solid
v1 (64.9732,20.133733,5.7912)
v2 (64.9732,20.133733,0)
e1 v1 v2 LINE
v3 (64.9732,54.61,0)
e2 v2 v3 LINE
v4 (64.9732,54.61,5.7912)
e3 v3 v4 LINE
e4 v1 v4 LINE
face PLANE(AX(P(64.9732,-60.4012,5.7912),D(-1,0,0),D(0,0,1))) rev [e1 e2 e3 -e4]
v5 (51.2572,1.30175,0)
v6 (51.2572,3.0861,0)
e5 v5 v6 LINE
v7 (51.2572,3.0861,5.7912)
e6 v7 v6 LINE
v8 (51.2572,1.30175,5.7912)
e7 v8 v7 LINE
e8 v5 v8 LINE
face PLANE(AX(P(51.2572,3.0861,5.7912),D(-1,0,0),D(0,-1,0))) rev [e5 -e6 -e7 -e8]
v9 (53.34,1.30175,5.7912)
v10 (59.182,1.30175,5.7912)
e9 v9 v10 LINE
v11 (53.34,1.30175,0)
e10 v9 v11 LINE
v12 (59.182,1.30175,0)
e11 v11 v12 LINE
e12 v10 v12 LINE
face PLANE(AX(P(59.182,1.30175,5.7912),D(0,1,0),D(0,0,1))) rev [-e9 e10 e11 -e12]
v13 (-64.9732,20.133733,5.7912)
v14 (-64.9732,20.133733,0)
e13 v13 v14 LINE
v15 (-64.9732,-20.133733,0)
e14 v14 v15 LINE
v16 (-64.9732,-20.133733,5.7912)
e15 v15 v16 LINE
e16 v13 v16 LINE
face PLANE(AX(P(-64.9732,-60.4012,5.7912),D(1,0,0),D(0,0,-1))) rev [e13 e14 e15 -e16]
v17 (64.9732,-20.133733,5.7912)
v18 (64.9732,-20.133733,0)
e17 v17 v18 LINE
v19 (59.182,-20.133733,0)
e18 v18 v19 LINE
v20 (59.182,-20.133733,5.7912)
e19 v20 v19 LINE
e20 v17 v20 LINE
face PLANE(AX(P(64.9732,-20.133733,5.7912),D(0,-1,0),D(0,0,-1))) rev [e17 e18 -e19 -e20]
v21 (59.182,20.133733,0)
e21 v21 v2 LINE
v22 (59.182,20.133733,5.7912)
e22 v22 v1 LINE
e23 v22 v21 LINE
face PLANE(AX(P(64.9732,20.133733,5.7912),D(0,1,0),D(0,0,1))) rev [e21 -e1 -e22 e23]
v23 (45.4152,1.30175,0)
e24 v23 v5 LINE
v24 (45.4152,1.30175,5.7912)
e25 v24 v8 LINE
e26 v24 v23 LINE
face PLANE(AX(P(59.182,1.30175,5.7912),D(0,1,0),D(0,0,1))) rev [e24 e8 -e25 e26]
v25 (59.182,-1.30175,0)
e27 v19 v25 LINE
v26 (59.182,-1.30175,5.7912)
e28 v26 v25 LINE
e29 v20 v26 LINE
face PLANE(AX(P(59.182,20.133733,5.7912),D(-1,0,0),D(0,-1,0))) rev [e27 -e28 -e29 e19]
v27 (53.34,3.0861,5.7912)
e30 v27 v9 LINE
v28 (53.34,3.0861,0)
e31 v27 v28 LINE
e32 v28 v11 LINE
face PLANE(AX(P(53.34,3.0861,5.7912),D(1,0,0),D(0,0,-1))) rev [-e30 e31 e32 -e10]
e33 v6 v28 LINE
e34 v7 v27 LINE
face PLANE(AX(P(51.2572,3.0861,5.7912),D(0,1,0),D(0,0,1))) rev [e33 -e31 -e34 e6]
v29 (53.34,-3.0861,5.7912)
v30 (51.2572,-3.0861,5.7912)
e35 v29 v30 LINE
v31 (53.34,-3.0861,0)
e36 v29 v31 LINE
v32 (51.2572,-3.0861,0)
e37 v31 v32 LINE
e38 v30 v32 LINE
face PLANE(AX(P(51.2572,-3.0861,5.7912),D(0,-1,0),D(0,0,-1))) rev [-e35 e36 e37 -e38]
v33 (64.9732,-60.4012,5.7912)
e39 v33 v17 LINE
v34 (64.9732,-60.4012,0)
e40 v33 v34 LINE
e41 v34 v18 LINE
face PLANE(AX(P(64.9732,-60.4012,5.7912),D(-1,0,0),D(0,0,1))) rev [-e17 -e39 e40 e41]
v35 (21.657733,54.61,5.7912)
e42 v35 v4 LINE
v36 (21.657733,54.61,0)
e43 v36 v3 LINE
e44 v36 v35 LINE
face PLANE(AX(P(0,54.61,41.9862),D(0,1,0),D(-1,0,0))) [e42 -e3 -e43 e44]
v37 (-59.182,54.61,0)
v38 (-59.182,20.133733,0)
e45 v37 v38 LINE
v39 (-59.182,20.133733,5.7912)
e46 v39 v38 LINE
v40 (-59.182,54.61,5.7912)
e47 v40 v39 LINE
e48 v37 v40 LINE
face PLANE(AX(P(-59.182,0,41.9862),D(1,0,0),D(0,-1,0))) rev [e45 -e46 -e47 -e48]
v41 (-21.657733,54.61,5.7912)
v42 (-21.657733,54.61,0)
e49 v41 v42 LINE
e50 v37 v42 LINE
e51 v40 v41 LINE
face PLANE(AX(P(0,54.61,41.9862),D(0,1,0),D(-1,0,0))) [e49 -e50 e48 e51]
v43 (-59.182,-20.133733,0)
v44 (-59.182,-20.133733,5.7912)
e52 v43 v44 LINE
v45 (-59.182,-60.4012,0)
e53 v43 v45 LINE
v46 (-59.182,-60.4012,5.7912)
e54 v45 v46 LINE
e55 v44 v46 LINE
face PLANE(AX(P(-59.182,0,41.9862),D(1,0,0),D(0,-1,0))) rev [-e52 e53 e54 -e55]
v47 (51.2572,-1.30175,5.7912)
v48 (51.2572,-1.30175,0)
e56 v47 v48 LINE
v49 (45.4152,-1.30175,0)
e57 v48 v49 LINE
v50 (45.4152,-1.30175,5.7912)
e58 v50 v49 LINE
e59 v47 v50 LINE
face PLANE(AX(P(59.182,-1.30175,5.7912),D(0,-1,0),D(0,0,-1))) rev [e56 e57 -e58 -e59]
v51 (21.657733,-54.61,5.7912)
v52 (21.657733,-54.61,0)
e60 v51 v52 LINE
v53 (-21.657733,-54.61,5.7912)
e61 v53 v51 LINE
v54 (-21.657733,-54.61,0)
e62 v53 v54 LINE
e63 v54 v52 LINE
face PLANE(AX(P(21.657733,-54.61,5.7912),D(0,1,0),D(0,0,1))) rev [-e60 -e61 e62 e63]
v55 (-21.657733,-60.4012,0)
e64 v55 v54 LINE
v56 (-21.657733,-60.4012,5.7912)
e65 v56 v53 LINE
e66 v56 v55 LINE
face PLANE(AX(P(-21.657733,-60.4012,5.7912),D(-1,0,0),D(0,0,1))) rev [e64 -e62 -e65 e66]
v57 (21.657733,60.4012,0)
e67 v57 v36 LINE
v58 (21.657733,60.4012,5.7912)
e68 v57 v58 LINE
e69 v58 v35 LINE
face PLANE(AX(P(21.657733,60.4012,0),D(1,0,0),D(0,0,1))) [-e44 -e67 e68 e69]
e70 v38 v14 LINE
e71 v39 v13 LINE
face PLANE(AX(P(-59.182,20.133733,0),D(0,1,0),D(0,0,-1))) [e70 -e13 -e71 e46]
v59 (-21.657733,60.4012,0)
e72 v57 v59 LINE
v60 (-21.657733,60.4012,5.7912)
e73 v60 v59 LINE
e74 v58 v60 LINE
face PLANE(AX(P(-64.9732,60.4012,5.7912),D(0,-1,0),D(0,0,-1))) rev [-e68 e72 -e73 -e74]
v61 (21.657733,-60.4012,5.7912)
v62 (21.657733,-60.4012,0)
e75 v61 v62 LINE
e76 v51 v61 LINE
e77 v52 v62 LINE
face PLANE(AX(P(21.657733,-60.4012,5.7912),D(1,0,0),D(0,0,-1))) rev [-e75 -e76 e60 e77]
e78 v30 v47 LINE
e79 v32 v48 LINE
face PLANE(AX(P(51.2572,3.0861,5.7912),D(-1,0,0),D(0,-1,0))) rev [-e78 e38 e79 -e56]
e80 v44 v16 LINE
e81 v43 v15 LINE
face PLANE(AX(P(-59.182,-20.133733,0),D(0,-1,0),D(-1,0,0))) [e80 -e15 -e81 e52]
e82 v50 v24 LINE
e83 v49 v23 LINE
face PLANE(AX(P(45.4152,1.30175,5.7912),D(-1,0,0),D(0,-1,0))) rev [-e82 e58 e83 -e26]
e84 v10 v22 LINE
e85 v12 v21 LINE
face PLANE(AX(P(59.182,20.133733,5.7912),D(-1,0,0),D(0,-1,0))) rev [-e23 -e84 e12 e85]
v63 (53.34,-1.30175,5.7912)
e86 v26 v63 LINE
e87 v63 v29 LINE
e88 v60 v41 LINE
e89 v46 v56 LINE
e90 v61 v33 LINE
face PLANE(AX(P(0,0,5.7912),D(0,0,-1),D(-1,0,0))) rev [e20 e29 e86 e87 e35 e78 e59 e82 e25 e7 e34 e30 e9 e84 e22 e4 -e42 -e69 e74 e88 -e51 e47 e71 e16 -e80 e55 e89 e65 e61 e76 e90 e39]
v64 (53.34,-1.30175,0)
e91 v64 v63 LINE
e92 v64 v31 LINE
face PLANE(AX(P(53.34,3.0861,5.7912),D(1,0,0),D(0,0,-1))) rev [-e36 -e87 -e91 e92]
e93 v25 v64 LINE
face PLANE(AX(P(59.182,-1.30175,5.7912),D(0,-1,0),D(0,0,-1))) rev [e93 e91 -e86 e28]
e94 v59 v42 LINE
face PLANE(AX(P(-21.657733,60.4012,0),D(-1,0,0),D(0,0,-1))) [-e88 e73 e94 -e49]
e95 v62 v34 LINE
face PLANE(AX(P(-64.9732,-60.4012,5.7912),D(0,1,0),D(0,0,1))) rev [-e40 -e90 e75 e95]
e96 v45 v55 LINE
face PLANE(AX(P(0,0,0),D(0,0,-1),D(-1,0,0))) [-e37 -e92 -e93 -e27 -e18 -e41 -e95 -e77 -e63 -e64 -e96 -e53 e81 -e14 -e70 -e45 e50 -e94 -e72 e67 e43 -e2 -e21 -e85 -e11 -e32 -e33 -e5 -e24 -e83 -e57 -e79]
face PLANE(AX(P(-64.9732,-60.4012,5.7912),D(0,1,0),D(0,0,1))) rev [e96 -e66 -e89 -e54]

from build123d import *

# Parameters (mm, degrees)
SKETCH1_W           = 129.9464
SKETCH1_H           = 120.8024
BOSS_EXTRUDE1_DEPTH = 5.7912
SKETCH3_W           = 43.315466666
SKETCH3_H           = 5.7912
CUT_EXTRUDE2_DEPTH  = 89.900841825
SKETCH6_W           = 5.7912
SKETCH6_H           = 40.267466666
CUT_EXTRUDE5_DEPTH  = 89.900841825
SKETCH7_W           = 13.7668
SKETCH7_H           = 2.6035
CUT_EXTRUDE6_DEPTH  = 89.900841825
SKETCH8_W           = 2.0828
SKETCH8_H           = 6.1722
CUT_EXTRUDE7_DEPTH  = 89.900841825
CAVITY1_START       = -64.9732
CAVITY1_OUTLINE_W   = 40.267466667
CAVITY1_OUTLINE_H   = 5.7912
CAVITY1_DEPTH       = 5.7912
CAVITY1_START_2     = 21.657733333
CAVITY1_2_OUTLINE_W = 5.7912
CAVITY1_2_OUTLINE_H = 5.7912
CAVITY1_2_DEPTH     = 43.315466667
CAVITY1_START_3     = -59.182
CAVITY1_3_OUTLINE_W = 5.7912
CAVITY1_3_OUTLINE_H = 5.7912
CAVITY1_3_DEPTH     = 37.524266667


# Read off the part's stored shape, not the designer's step: Cavity1
with BuildPart() as part:
    # Sketch1 → Boss-Extrude1 (new body)
    with BuildSketch(Plane.XY):
        Rectangle(SKETCH1_W, SKETCH1_H)
    extrude(amount=BOSS_EXTRUDE1_DEPTH)

    # Sketch3 → Cut-Extrude2 (cut, through all)
    with BuildSketch(Plane(origin=(0, 0, 0), x_dir=(-1, 0, 0), z_dir=(0, 0, -1))):
        with Locations((0, -57.5056)):
            Rectangle(SKETCH3_W, SKETCH3_H)
    extrude(amount=-CUT_EXTRUDE2_DEPTH, mode=Mode.SUBTRACT)

    # Sketch6 → Cut-Extrude5 (cut, through all)
    with BuildSketch(Plane(origin=(0, 0, 0), x_dir=(-1, 0, 0), z_dir=(0, 0, -1))):
        with Locations((-62.0776, 0)):
            Rectangle(SKETCH6_W, SKETCH6_H)
    extrude(amount=-CUT_EXTRUDE5_DEPTH, mode=Mode.SUBTRACT)

    # Sketch7 → Cut-Extrude6 (cut, through all)
    with BuildSketch(Plane(origin=(0, 0, 0), x_dir=(-1, 0, 0), z_dir=(0, 0, -1))):
        with Locations((-52.2986, 0)):
            Rectangle(SKETCH7_W, SKETCH7_H)
    extrude(amount=-CUT_EXTRUDE6_DEPTH, mode=Mode.SUBTRACT)

    # Sketch8 → Cut-Extrude7 (cut, through all)
    with BuildSketch(Plane(origin=(0, 0, 0), x_dir=(-1, 0, 0), z_dir=(0, 0, -1))):
        with Locations((-52.2986, 0)):
            Rectangle(SKETCH8_W, SKETCH8_H)
    extrude(amount=-CUT_EXTRUDE7_DEPTH, mode=Mode.SUBTRACT)

    # Cavity1 outline → Cavity1 (cut)
    with BuildSketch(Plane.YZ.offset(CAVITY1_START)):
        with Locations((40.267466666, 2.8956)):
            Rectangle(CAVITY1_OUTLINE_W, CAVITY1_OUTLINE_H)
        with Locations((-40.267466666, 2.8956)):
            Rectangle(CAVITY1_OUTLINE_W, CAVITY1_OUTLINE_H)
    extrude(amount=CAVITY1_DEPTH, mode=Mode.SUBTRACT)

    # Cavity1 2 outline → Cavity1 2 (cut)
    with BuildSketch(Plane.YZ.offset(CAVITY1_START_2)):
        with Locations((57.5056, 2.8956)):
            Rectangle(CAVITY1_2_OUTLINE_W, CAVITY1_2_OUTLINE_H)
    extrude(amount=CAVITY1_2_DEPTH, mode=Mode.SUBTRACT)

    # Cavity1 3 outline → Cavity1 3 (cut)
    with BuildSketch(Plane.YZ.offset(CAVITY1_START_3)):
        with Locations((57.5056, 2.8956)):
            Rectangle(CAVITY1_3_OUTLINE_W, CAVITY1_3_OUTLINE_H)
    extrude(amount=CAVITY1_3_DEPTH, mode=Mode.SUBTRACT)


solid = part.part
